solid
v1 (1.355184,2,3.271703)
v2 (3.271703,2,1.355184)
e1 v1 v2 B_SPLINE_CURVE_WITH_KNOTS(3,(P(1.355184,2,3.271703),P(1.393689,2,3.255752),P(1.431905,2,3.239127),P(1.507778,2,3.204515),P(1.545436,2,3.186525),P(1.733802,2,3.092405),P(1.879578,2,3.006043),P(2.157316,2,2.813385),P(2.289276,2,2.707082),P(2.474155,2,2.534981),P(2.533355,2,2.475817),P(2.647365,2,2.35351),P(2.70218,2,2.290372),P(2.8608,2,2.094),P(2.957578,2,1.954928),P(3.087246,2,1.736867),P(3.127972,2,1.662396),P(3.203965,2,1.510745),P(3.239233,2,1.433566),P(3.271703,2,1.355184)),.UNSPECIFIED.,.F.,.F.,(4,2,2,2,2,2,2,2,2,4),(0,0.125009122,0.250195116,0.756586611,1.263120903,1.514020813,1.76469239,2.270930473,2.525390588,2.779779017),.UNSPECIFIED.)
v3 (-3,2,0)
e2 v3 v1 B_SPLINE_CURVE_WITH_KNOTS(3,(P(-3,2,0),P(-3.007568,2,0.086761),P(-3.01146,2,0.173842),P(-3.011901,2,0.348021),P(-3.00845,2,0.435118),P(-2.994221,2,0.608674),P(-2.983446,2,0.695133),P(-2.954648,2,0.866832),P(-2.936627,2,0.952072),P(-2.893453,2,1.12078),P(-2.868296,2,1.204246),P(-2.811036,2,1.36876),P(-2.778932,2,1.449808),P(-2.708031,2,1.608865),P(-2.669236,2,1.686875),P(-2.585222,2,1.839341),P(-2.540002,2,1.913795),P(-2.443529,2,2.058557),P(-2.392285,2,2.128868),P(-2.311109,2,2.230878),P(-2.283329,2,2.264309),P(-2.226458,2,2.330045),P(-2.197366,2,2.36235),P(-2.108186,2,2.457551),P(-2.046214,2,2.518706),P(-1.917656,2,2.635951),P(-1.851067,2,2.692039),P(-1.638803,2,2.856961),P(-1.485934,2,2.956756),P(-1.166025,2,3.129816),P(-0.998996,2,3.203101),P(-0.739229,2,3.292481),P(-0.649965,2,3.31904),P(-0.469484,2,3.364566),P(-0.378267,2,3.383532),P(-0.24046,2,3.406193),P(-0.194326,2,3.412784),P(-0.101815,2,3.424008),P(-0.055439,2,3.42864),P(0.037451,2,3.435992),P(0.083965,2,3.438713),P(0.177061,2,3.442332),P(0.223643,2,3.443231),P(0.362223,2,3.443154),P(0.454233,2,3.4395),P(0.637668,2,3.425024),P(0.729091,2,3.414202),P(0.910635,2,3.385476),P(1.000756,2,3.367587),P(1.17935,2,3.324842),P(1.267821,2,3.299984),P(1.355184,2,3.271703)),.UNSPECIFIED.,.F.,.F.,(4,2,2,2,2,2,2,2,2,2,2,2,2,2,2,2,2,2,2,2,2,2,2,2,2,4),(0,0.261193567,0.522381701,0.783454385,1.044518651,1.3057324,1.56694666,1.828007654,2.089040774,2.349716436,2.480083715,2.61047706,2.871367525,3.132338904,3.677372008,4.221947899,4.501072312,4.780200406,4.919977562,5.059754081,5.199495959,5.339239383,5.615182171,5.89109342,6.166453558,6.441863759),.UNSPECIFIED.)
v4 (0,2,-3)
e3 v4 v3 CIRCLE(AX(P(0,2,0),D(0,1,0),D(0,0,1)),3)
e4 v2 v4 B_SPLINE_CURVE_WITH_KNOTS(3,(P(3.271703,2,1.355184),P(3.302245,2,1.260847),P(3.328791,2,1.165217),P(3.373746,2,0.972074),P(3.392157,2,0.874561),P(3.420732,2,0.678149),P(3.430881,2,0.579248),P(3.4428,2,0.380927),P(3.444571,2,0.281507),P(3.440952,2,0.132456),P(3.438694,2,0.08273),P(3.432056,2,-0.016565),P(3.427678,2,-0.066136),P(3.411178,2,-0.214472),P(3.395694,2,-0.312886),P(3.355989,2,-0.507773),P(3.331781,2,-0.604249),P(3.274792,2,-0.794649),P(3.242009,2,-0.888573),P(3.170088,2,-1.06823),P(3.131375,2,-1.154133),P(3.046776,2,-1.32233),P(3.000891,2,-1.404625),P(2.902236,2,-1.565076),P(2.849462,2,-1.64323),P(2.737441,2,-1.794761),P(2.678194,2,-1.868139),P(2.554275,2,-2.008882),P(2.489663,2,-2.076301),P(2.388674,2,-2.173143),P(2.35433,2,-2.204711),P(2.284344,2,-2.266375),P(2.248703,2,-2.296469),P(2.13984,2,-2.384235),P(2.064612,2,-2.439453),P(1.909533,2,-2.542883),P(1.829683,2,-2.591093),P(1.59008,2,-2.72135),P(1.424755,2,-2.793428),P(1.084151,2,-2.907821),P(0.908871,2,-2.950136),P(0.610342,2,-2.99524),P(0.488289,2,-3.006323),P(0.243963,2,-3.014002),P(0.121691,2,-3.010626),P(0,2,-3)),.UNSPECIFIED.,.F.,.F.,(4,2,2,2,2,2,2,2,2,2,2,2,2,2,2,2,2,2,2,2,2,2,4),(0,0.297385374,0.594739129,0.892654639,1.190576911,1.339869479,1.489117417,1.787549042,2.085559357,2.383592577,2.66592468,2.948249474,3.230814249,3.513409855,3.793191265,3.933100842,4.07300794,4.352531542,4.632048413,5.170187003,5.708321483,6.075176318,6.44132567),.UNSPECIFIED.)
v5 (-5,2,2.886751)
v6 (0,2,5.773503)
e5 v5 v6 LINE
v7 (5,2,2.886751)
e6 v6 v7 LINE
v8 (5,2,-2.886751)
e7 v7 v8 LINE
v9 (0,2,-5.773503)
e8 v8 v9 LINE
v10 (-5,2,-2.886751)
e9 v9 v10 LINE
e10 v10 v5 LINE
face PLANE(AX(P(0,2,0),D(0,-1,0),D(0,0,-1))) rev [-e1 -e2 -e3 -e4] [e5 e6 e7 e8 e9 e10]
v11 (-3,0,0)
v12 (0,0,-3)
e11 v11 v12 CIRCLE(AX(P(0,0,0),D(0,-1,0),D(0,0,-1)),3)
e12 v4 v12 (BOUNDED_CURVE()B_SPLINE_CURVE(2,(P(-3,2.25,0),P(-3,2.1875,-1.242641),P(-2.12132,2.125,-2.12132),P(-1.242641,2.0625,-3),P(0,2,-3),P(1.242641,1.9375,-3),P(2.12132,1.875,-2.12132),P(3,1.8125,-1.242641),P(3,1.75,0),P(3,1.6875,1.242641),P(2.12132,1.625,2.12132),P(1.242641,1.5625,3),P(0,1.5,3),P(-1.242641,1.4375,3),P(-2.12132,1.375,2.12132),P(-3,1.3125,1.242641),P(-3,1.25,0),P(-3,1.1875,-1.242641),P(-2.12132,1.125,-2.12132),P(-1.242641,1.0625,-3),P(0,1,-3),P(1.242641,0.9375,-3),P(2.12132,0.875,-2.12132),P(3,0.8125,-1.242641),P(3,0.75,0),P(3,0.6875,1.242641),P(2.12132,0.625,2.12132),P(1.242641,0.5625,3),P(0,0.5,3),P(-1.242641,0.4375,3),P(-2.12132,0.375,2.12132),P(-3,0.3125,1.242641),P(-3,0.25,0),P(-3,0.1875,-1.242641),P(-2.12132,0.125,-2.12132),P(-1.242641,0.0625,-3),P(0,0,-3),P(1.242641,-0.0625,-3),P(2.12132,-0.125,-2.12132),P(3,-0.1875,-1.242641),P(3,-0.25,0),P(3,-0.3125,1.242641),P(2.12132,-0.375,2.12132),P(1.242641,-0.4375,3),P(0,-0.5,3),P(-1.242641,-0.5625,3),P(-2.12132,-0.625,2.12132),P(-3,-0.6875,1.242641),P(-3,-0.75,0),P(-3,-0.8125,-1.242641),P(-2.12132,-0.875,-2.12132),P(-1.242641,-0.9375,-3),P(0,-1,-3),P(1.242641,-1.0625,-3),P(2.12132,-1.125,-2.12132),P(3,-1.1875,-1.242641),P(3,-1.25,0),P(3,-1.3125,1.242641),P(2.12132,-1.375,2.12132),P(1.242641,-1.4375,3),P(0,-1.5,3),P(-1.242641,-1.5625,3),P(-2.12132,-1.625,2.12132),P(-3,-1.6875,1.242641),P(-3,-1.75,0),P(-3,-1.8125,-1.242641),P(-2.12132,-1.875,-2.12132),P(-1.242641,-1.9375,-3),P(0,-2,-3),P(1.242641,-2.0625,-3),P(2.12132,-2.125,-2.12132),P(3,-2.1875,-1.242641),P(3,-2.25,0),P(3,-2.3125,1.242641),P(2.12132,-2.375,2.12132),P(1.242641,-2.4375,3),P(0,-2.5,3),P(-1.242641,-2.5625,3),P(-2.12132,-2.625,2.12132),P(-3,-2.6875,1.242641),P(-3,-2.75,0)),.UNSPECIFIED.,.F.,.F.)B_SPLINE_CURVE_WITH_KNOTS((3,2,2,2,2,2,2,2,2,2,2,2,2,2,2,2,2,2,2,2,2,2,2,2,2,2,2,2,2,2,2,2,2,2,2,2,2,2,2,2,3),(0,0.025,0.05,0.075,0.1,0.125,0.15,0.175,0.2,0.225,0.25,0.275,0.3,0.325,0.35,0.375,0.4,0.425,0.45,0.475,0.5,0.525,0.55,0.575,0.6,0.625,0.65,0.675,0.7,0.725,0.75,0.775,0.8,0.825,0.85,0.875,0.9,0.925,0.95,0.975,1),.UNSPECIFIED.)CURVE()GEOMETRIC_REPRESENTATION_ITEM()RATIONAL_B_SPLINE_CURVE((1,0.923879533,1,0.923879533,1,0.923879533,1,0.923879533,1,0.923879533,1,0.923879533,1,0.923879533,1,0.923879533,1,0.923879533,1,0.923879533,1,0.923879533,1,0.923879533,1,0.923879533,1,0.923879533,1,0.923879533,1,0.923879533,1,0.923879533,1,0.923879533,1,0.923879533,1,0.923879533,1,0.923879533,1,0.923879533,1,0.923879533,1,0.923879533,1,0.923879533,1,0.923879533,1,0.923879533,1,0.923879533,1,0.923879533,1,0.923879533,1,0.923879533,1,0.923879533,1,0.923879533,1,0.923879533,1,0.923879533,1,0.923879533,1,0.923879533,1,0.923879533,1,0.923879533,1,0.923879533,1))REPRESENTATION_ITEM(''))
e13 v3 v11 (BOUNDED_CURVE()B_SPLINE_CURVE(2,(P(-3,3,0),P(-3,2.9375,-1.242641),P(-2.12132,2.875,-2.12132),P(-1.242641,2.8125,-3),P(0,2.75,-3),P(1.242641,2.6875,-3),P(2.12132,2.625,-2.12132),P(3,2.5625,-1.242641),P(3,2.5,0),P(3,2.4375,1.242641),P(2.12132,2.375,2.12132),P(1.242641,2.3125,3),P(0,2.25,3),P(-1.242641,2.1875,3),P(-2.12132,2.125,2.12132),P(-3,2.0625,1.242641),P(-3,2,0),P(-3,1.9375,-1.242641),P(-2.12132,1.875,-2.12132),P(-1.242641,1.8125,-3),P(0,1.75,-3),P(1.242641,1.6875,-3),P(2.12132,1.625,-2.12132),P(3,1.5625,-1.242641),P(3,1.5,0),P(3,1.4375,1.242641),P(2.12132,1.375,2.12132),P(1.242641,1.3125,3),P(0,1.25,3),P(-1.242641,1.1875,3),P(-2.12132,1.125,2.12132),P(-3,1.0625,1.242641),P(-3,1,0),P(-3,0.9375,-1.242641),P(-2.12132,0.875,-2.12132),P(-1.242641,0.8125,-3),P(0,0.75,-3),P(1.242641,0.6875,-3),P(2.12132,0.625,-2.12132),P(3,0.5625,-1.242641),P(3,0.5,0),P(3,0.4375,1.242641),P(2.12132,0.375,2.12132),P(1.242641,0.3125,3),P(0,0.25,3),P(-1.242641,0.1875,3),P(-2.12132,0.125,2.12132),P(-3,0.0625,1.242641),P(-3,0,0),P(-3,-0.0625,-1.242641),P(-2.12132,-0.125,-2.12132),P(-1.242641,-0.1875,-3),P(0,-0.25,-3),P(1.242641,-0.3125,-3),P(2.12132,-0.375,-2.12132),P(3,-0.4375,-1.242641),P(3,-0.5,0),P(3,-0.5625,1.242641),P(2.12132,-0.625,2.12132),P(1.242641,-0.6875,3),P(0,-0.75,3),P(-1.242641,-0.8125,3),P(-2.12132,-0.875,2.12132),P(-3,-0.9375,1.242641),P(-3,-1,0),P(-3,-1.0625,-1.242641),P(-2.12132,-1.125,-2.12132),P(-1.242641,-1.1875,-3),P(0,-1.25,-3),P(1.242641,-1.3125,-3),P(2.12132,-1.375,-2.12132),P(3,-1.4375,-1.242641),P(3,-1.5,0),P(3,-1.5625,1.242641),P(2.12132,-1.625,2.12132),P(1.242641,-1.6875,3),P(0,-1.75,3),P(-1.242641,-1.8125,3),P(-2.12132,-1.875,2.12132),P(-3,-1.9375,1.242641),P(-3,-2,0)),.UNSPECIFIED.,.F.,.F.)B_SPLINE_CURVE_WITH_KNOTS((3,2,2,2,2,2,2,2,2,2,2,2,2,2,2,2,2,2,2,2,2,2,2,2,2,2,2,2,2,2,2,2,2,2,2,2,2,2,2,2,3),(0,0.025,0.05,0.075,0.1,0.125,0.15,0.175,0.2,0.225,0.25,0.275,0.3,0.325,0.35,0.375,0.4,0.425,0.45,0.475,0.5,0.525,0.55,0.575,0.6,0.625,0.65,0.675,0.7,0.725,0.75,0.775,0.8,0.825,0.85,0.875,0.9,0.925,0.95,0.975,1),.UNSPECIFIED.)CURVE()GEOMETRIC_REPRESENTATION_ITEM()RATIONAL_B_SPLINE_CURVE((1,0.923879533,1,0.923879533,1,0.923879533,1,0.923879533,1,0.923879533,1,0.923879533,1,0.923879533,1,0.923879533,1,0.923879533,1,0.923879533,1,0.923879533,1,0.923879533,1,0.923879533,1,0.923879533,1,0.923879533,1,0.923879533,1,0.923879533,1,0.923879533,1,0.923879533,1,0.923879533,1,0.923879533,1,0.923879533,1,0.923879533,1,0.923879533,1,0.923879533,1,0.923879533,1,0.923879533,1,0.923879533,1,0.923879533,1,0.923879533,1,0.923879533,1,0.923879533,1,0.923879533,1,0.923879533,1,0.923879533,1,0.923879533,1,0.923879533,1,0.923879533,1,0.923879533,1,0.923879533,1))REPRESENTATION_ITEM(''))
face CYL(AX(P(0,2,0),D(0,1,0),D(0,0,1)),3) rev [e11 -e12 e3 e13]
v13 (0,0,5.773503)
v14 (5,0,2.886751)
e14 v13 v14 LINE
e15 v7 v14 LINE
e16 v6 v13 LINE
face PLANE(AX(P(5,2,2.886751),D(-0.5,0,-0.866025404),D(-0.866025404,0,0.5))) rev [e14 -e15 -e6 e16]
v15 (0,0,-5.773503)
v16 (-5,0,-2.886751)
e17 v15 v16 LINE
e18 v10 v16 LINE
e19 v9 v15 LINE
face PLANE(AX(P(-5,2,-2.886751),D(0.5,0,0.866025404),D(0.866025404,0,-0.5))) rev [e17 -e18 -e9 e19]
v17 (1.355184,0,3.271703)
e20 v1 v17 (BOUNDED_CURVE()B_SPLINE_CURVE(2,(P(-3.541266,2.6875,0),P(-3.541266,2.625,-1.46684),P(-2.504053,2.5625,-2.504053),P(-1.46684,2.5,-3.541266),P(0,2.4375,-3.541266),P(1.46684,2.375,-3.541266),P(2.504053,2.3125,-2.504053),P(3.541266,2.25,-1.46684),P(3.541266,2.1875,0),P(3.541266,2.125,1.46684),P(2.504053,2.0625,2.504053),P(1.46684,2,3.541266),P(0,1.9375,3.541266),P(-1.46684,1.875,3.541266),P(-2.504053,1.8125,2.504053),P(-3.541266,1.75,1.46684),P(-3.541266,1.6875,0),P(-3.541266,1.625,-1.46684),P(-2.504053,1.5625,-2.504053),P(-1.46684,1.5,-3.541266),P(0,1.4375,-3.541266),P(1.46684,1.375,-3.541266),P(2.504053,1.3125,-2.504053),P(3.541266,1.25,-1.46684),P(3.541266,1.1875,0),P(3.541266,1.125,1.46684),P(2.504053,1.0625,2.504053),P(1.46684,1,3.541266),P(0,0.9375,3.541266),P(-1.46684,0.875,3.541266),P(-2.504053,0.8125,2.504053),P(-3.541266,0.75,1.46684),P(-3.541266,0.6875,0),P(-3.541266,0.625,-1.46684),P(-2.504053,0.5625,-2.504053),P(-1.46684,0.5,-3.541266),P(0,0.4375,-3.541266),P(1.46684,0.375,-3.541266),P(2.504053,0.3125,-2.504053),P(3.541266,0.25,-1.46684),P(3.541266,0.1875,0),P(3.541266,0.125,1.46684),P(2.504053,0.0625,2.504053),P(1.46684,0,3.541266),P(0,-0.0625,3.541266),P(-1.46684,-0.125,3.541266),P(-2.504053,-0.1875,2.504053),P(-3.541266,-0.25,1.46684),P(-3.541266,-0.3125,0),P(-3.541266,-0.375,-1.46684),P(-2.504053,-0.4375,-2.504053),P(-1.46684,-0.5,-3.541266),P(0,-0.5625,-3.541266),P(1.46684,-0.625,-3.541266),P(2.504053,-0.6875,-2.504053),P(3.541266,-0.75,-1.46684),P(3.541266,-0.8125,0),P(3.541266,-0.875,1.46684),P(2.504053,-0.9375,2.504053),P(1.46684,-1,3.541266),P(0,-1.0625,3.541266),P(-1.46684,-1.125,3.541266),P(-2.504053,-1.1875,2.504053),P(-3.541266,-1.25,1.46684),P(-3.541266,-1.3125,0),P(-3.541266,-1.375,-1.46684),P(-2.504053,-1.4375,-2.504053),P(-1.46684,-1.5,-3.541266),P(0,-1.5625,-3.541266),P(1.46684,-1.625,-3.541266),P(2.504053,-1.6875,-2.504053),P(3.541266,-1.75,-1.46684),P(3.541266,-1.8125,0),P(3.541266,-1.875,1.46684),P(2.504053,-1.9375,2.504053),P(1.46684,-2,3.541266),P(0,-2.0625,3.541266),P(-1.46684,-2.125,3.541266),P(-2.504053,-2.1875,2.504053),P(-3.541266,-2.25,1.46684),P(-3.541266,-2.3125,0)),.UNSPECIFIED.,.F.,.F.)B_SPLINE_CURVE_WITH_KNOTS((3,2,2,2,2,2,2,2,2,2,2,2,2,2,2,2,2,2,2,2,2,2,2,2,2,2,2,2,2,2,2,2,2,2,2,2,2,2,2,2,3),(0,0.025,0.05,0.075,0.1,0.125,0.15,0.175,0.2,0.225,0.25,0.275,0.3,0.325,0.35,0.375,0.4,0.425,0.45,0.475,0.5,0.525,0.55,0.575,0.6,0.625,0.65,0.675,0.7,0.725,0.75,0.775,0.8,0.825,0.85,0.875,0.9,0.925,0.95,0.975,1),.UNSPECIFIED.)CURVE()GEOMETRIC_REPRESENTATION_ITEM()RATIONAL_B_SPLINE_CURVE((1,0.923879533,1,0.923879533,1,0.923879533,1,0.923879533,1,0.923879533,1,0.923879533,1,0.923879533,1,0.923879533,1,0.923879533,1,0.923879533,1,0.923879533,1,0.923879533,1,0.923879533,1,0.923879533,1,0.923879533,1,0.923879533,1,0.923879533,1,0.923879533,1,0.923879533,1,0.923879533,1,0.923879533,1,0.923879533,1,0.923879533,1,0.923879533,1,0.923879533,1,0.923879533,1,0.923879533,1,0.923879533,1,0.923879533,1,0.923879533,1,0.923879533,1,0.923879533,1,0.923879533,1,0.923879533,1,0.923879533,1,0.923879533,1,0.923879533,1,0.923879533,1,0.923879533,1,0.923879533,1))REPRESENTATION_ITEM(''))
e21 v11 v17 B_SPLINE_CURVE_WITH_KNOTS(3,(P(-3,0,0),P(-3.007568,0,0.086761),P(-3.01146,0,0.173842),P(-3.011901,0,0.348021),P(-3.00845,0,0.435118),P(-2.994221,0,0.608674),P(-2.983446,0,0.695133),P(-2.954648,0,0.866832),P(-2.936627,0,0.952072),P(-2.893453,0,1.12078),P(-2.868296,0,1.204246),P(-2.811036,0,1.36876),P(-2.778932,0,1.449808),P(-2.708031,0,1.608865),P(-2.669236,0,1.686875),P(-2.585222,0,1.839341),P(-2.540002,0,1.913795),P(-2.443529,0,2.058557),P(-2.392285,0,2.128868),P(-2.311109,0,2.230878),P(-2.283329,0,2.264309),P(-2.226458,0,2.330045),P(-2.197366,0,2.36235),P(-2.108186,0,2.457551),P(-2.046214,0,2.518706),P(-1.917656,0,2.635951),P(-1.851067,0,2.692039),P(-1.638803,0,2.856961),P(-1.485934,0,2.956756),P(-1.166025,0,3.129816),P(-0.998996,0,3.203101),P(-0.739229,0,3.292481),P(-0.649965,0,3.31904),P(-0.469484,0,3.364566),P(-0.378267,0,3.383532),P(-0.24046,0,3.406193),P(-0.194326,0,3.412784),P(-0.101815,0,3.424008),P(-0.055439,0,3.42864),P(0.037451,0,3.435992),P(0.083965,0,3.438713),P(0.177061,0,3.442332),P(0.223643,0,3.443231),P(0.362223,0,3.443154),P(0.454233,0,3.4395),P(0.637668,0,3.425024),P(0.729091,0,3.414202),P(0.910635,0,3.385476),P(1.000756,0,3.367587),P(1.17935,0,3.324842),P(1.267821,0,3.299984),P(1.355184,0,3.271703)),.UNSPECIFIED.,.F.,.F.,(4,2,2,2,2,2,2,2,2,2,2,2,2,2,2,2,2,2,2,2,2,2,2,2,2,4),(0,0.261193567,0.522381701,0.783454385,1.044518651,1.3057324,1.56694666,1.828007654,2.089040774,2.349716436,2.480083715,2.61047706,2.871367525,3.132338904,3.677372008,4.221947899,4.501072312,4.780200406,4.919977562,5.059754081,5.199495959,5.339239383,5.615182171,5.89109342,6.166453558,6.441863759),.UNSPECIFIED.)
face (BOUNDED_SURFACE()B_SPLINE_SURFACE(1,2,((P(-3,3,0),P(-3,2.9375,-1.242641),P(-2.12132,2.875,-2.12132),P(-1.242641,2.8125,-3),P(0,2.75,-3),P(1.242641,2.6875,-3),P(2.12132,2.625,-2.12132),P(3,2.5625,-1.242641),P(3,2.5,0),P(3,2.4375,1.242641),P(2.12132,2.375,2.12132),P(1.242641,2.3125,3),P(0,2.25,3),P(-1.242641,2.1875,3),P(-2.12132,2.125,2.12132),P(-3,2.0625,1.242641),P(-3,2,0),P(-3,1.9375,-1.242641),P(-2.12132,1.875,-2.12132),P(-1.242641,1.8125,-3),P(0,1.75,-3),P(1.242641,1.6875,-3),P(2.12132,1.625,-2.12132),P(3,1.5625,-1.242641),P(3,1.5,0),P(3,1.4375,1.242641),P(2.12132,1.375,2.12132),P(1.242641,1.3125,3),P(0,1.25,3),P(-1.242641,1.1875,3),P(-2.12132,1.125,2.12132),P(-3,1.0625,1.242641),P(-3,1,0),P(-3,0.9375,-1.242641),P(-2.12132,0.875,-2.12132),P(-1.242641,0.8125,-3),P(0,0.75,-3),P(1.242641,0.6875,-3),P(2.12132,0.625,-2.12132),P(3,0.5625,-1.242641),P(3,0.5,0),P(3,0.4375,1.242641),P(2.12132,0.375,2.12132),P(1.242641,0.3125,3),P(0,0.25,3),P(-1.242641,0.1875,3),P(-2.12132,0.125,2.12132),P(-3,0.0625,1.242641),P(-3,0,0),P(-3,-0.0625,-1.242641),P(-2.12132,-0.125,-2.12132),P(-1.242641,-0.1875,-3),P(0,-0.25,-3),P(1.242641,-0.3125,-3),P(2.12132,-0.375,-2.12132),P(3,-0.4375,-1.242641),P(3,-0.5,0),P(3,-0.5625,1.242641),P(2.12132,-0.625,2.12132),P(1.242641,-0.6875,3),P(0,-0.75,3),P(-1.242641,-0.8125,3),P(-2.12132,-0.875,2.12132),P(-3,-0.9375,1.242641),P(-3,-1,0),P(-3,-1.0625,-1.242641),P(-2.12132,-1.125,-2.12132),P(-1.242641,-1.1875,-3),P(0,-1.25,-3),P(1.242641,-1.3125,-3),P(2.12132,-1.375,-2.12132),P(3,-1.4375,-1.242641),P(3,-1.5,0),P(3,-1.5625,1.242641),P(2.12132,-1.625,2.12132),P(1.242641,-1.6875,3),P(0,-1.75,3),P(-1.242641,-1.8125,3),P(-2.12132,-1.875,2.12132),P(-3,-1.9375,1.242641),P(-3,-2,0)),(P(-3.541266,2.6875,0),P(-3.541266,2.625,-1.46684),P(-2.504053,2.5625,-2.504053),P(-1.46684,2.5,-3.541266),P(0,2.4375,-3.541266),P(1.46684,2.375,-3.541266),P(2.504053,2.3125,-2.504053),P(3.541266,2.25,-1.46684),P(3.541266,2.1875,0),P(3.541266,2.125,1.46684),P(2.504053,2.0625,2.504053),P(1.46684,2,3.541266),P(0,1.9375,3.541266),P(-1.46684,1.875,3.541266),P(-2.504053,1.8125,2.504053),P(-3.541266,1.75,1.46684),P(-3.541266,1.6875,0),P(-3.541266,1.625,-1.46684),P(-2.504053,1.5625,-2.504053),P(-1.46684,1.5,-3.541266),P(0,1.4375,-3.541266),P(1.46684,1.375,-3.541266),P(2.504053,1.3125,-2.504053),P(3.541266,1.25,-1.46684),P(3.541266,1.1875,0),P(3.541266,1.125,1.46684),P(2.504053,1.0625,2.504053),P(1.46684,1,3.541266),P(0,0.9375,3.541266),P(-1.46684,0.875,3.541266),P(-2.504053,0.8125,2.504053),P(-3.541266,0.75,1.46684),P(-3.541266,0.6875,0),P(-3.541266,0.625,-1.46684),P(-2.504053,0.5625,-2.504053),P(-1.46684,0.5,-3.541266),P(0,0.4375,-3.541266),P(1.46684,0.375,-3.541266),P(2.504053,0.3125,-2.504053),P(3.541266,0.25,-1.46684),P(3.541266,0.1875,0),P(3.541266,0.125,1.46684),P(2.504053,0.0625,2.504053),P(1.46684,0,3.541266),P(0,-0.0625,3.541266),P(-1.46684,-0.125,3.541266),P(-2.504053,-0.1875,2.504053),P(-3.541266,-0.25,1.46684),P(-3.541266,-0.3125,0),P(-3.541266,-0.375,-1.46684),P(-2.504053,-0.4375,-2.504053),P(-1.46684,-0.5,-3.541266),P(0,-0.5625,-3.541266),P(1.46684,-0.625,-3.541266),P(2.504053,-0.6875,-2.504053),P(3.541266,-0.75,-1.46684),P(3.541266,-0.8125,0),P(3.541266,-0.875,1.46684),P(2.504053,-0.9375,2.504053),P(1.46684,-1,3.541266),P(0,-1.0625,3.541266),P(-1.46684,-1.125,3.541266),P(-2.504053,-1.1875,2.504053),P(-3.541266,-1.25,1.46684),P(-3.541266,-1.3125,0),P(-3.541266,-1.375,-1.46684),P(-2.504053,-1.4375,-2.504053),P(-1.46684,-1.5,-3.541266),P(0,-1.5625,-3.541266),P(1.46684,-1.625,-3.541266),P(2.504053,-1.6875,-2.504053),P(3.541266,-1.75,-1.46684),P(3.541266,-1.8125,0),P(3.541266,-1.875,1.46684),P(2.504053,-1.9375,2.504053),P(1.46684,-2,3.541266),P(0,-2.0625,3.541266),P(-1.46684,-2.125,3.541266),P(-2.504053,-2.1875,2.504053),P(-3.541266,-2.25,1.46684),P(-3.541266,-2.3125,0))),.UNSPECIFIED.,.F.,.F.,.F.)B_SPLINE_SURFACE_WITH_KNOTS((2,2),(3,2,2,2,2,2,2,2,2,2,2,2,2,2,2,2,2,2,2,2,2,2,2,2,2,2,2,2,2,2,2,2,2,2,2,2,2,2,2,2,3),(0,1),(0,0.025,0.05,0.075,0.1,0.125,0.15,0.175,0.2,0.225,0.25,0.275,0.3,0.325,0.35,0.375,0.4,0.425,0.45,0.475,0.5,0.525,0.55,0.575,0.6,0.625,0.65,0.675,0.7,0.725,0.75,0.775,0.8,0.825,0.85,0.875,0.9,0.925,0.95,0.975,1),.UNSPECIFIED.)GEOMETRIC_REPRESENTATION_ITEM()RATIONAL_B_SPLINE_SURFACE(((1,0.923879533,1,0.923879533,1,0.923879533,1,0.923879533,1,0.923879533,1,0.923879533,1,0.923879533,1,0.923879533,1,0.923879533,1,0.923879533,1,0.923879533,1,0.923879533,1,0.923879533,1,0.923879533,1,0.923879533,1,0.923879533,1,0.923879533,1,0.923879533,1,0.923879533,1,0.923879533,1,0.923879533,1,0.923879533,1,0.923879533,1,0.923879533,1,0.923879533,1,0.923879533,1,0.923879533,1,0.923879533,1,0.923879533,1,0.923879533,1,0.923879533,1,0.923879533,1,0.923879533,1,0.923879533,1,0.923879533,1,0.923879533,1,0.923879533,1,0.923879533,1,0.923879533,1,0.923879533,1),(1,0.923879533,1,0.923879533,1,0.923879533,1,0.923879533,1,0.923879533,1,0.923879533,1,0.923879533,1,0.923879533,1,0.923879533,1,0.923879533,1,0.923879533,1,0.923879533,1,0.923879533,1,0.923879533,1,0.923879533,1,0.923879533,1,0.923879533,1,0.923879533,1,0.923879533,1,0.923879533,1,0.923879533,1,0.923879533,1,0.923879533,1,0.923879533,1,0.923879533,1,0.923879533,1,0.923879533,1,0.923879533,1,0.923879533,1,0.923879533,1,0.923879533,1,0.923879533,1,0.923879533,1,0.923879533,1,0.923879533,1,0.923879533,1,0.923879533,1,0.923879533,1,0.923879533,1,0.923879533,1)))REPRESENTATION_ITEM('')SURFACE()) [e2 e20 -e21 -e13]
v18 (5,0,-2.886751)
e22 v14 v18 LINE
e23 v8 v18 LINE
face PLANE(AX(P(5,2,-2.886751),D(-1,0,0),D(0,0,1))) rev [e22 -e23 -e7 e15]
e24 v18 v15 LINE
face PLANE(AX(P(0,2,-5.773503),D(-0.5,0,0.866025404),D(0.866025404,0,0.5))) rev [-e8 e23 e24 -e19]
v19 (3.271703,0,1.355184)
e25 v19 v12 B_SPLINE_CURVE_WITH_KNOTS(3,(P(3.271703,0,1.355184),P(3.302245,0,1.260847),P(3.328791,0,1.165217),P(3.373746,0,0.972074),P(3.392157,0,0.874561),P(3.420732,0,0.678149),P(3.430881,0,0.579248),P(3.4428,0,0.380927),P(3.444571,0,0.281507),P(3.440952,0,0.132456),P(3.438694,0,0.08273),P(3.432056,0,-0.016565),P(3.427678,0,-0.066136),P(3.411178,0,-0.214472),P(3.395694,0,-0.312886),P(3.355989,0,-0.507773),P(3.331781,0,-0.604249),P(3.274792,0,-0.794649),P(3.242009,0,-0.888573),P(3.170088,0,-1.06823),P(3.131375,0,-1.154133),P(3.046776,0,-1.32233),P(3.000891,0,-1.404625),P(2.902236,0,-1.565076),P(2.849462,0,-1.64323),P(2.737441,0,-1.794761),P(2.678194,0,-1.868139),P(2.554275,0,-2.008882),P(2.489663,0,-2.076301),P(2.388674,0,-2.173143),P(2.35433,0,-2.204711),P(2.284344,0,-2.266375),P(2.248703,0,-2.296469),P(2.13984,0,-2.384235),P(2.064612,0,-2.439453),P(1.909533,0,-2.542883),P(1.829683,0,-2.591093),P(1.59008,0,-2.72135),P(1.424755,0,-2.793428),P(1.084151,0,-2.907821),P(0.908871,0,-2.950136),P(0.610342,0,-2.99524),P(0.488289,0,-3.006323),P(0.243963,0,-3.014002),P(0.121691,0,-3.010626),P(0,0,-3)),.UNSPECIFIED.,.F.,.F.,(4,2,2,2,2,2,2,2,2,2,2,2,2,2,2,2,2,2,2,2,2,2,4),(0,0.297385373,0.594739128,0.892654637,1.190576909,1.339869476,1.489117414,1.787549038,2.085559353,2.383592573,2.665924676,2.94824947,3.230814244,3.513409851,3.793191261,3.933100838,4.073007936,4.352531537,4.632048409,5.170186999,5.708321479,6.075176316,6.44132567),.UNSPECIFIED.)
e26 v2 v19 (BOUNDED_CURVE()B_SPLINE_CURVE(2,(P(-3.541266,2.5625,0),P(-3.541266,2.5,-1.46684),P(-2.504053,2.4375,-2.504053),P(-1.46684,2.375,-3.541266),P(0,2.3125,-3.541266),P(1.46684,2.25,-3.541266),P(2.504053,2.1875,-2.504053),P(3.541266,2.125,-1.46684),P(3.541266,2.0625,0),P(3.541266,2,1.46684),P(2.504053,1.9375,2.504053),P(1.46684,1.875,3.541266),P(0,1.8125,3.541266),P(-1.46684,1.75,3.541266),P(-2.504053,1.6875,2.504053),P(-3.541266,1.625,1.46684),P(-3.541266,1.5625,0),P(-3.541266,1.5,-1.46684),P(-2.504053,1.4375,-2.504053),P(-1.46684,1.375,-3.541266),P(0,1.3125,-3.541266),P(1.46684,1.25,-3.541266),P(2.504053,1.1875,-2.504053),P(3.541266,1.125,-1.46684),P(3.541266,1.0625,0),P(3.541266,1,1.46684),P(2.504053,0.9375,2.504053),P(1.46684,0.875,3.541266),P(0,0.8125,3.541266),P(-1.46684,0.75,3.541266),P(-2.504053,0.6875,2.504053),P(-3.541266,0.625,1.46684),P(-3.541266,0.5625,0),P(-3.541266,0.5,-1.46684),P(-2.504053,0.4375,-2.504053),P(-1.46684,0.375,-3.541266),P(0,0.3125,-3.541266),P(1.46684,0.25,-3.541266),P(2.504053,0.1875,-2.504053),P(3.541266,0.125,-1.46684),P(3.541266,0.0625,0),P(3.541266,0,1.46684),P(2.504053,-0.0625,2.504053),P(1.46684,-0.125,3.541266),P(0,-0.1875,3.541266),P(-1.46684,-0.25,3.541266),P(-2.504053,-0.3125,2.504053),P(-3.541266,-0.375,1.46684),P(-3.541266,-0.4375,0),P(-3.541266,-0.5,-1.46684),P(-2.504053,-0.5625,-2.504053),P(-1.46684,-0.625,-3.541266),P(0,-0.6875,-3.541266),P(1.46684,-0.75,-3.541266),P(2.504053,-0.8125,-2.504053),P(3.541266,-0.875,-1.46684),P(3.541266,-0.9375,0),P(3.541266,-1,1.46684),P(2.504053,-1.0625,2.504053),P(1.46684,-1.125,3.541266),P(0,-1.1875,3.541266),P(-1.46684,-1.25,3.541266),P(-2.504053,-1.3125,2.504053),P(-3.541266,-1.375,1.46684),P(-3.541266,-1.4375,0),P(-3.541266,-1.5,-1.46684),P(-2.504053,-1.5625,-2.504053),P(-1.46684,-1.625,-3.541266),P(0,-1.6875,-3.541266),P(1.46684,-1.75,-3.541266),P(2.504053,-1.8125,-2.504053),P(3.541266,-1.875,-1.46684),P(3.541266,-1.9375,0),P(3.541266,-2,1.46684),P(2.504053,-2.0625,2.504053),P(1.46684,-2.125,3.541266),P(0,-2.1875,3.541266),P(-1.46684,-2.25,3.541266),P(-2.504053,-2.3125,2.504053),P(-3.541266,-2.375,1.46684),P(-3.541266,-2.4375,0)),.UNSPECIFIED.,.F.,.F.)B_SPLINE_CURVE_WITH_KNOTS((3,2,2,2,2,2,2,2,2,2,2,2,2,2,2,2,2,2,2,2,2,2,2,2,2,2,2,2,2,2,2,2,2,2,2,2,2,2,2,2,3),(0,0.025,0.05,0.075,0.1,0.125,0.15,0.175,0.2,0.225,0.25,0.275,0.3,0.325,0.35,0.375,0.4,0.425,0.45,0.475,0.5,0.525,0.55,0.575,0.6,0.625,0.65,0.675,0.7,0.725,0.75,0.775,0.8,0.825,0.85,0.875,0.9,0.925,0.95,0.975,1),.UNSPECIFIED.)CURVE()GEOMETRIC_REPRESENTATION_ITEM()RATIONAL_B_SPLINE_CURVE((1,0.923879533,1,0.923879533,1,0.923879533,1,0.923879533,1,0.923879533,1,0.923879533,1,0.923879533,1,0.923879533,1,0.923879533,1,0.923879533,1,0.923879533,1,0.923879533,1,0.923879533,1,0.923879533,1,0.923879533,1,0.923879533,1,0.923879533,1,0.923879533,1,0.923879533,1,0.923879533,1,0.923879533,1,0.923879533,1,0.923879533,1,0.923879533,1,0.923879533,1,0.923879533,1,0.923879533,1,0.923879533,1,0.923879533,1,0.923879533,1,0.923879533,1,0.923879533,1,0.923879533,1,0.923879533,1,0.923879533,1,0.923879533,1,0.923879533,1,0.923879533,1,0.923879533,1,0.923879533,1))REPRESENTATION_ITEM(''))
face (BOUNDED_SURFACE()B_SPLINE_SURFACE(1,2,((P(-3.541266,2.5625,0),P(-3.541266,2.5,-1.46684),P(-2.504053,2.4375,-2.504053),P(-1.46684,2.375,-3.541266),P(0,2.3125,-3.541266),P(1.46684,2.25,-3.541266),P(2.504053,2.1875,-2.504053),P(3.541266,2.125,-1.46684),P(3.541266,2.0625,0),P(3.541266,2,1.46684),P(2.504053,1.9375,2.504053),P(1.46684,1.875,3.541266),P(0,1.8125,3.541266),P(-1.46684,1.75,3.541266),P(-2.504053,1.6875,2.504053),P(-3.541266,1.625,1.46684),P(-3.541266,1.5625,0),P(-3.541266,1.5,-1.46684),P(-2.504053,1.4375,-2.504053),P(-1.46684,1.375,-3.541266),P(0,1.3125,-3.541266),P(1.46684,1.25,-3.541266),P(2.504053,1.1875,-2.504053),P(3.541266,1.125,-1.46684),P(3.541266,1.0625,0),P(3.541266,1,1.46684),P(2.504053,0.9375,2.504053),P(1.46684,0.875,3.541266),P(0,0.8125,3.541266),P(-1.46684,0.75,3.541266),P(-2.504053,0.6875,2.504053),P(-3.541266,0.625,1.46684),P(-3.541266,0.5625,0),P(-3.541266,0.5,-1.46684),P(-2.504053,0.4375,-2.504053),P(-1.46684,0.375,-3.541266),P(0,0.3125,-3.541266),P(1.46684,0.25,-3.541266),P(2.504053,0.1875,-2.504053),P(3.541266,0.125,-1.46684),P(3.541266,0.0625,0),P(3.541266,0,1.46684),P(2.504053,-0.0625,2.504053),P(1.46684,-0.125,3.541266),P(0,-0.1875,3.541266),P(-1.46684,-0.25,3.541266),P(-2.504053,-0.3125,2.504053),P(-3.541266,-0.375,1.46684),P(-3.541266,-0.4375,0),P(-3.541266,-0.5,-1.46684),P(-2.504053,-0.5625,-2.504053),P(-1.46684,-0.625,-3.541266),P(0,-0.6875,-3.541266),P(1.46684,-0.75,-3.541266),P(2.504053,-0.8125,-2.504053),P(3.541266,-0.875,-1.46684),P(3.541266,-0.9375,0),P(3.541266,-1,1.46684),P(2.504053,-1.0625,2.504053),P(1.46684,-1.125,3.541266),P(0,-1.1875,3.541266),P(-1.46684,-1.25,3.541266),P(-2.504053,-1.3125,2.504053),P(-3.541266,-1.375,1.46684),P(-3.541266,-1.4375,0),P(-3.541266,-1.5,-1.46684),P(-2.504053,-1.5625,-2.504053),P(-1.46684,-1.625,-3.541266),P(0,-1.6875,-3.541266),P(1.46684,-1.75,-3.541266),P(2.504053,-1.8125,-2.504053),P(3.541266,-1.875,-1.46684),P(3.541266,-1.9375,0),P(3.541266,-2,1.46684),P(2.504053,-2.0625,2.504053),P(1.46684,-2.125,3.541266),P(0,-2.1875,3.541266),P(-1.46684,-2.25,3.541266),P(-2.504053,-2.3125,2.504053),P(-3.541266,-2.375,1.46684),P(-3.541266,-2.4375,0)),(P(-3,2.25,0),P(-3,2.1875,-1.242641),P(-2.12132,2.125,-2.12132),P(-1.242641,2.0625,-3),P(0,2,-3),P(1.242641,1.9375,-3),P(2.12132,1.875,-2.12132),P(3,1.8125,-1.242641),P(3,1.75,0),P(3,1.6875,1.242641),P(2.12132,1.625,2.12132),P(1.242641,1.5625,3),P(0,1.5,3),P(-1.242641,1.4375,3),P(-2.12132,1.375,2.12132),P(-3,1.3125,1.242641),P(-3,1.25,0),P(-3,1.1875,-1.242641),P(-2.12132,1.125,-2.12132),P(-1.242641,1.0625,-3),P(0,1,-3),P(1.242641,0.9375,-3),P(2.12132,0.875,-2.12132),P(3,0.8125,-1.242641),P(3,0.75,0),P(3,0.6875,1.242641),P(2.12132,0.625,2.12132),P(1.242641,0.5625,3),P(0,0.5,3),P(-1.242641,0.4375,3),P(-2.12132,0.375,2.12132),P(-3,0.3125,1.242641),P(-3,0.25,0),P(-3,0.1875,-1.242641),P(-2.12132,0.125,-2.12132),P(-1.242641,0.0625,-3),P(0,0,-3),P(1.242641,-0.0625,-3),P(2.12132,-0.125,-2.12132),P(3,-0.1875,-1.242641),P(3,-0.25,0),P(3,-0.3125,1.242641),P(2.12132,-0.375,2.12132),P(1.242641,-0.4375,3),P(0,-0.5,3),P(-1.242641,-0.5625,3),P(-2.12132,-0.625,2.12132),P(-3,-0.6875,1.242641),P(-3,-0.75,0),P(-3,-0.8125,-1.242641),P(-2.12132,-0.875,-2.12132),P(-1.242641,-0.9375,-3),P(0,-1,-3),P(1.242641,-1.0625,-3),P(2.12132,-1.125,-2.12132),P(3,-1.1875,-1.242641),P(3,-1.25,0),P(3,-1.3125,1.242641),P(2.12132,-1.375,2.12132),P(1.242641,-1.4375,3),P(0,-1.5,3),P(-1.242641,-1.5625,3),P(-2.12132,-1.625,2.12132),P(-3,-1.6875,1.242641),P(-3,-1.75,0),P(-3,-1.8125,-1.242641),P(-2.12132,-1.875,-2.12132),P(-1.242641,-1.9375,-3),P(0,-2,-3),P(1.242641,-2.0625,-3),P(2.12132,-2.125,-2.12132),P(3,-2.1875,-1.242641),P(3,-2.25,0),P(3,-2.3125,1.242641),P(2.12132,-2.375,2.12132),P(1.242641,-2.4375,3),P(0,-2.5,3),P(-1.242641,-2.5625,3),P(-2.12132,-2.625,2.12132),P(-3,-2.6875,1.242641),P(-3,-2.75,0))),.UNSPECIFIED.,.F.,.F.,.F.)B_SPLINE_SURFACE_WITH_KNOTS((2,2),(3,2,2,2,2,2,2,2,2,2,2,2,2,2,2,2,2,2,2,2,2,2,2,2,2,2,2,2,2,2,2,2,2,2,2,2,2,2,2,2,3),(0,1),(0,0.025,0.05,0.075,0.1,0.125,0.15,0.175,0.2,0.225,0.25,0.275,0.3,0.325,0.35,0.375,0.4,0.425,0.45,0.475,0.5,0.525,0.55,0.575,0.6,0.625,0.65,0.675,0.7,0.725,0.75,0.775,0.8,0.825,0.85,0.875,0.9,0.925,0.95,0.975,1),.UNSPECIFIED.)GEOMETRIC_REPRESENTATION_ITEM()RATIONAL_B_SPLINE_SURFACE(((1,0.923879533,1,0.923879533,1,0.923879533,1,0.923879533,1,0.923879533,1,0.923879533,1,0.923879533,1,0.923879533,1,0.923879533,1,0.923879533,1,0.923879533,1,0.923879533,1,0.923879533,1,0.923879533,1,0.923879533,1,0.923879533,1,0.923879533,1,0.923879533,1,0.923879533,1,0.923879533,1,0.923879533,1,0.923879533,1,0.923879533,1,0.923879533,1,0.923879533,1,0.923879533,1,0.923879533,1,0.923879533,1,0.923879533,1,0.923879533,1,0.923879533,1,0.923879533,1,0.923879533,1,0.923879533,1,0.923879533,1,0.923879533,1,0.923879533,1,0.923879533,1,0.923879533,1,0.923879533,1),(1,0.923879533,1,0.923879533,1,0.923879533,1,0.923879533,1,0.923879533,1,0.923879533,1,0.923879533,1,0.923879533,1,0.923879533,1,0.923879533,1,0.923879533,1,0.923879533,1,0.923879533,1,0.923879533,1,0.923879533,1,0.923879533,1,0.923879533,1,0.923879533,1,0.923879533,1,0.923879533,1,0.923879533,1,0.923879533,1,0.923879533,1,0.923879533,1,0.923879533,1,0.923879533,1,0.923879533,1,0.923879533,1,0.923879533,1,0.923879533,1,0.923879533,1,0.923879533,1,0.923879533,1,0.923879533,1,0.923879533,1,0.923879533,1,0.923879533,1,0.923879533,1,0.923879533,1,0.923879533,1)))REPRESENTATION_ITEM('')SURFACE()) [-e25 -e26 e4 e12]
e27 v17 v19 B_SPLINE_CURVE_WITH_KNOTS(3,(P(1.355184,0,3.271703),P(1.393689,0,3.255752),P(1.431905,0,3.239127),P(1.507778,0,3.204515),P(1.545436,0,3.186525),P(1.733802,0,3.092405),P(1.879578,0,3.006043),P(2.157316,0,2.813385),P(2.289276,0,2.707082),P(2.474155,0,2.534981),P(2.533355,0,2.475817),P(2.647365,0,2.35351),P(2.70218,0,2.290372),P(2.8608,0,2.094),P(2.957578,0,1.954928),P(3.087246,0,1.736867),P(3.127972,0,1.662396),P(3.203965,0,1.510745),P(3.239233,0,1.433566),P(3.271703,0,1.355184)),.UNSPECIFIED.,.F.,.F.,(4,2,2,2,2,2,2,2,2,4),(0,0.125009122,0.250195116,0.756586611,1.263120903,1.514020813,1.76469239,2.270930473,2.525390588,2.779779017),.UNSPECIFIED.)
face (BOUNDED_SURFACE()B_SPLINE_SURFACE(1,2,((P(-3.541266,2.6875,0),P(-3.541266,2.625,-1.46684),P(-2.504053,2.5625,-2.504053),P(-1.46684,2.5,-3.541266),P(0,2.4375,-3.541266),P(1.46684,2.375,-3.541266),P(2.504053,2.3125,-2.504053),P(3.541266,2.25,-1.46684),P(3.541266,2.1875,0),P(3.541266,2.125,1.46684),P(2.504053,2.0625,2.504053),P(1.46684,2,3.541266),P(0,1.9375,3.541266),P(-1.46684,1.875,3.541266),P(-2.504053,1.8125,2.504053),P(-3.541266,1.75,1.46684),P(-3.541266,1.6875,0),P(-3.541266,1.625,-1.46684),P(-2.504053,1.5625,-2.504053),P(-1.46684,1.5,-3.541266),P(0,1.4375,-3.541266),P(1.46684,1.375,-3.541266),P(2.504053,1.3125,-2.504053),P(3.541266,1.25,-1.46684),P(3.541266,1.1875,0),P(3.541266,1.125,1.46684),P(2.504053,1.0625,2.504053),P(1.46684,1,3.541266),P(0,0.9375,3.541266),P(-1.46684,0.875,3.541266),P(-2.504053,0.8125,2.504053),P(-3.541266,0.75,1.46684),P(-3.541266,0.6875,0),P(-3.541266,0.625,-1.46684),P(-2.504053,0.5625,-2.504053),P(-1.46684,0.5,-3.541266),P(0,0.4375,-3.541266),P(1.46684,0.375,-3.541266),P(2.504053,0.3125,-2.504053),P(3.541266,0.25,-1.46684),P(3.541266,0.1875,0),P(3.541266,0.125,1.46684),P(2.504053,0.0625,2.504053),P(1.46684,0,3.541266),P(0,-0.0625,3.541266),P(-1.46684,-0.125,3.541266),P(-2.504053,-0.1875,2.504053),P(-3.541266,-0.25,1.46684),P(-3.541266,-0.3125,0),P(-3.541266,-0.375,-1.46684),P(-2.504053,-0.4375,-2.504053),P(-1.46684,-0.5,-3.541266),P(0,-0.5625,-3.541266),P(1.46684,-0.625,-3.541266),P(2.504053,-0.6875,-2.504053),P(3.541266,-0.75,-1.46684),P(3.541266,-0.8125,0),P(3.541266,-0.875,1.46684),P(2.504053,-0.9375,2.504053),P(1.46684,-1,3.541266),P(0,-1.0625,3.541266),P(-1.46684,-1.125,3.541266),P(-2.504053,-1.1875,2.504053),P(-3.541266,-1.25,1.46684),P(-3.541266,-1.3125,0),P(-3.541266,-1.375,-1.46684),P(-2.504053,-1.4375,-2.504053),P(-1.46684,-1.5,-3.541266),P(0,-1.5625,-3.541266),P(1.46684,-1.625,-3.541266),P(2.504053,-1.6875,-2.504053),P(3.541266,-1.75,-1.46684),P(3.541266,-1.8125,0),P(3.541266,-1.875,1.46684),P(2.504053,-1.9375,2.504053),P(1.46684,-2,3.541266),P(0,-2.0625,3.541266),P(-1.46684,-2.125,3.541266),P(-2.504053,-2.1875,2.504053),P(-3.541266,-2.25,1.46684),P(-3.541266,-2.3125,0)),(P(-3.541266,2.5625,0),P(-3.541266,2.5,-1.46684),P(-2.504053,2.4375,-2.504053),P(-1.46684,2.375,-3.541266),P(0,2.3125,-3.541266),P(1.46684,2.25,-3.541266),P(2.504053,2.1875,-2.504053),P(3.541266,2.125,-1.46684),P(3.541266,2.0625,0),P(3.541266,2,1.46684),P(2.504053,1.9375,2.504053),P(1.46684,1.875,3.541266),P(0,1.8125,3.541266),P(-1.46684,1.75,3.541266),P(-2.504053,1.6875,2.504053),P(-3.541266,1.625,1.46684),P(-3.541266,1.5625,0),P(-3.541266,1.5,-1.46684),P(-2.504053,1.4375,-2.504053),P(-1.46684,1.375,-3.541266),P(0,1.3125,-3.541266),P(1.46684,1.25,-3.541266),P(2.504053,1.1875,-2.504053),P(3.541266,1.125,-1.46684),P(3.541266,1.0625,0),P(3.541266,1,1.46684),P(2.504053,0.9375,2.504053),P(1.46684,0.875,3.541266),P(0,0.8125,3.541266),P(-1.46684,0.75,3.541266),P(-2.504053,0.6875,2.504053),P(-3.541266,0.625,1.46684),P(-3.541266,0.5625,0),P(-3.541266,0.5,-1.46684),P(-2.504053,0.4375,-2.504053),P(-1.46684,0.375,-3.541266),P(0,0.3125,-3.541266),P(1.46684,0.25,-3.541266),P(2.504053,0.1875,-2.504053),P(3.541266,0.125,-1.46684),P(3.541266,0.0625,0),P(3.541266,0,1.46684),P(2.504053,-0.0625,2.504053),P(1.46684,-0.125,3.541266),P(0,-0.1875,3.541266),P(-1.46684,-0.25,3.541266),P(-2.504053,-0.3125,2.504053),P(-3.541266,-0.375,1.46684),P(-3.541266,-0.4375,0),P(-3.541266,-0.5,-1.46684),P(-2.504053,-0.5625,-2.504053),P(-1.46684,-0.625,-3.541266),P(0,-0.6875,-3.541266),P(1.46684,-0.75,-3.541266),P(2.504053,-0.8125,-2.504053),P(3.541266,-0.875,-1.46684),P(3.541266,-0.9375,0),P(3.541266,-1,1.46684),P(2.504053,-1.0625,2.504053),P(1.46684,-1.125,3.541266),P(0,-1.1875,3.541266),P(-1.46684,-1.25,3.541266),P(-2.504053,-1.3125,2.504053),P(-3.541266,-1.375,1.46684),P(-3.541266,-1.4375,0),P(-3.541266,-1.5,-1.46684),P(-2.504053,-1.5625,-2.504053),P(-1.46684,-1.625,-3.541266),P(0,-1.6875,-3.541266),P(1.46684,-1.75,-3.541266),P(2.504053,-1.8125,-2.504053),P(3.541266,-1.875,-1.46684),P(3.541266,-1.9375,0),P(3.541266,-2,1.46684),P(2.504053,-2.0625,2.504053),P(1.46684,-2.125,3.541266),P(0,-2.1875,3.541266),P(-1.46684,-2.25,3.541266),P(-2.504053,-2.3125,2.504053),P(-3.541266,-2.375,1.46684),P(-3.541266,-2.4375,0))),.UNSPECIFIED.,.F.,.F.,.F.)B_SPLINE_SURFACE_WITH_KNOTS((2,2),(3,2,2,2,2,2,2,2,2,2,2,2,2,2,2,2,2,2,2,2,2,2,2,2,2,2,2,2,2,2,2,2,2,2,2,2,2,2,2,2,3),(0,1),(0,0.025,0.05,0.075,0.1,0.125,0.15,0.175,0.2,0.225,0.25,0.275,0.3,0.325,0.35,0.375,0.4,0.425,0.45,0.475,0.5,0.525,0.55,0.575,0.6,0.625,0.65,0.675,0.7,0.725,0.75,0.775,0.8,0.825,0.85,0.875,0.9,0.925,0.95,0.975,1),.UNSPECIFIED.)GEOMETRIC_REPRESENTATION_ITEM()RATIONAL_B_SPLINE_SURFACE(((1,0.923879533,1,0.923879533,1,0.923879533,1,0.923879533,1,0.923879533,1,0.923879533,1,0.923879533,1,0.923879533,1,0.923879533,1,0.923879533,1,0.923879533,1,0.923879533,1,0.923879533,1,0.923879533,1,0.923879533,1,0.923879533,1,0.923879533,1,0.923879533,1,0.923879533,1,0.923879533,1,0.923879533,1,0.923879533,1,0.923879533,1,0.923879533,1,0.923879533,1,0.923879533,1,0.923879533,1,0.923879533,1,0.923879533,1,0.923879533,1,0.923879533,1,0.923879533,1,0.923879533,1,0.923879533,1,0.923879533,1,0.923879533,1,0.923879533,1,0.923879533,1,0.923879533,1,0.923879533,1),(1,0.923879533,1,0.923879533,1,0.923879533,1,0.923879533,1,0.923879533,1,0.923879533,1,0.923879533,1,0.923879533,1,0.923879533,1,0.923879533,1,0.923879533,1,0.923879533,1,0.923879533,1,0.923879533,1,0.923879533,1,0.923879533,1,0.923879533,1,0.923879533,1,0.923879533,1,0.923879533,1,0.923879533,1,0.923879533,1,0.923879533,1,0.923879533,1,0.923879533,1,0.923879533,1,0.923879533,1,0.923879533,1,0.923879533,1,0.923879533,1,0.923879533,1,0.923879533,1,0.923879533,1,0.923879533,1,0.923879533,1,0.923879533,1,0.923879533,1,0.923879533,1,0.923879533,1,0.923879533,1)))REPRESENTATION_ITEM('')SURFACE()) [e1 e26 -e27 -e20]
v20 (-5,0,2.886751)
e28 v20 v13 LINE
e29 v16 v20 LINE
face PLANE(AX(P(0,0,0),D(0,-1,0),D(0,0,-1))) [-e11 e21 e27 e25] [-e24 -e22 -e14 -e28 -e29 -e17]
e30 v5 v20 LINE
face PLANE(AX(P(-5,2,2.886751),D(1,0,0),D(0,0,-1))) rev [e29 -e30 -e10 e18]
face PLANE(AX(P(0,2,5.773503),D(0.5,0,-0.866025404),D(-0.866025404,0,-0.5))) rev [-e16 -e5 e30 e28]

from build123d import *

# Parameters (mm, degrees)
SKETCH_1_R      = 2.5
EXTRUDE_1_DEPTH = 2
M7X1_02_D       = 6
M7X1_02_DEPTH   = 10
M7X1_02_TIP     = 1.802581857
THREAD_2_PITCH  = 1


with BuildPart() as part:
    # Эскиз1 → Бобышка-Вытянуть1 (new body)
    with BuildSketch(Plane(origin=(0, 0, 0), x_dir=(1, 0, 0), z_dir=(0, 1, 0))):
        Polygon((-5, -2.886751346), (-5, 2.886751346), (0, 5.773502692), (5, 2.886751346), (5, -2.886751346), (0, -5.773502692), align=None)
        with Locations(Location((0, 0, 0), (0, 0, 270))):
            Circle(SKETCH_1_R, mode=Mode.SUBTRACT)
    extrude(amount=EXTRUDE_1_DEPTH)

    # Сверление под метчик M7x1.02
    with Locations(Plane(origin=(0, 2, 0), x_dir=(1, 0, 0), z_dir=(0, 1, 0))):
        with Locations((0, 0)):
            Hole(M7X1_02_D / 2, depth=M7X1_02_DEPTH)
            with Locations((0, 0, -(M7X1_02_DEPTH + M7X1_02_TIP / 2))):  # 118° drill point
                Cone(0, M7X1_02_D / 2, M7X1_02_TIP, mode=Mode.SUBTRACT)

    # Резьба2: the profile of Профиль резьбы2 profile screwed along a right-hand helix of 5 turns, 8 arcs to a turn; built about Z, then put on its axis
    thread_2_z = Axis((0, 0, 0), (0, 0, 1))
    thread_2_corners = [(2.9997, 0, -0.000173205), (3.541265875, 0, 0.312499999), (3.541265875, 0, 0.437499999), (2.9997, 0, 0.750173202)]
    with BuildLine(mode=Mode.PRIVATE) as thread_2_profile:
        Line(thread_2_corners[0], thread_2_corners[1])
        Line(thread_2_corners[1], thread_2_corners[2])
        Line(thread_2_corners[2], thread_2_corners[3])
        Line(thread_2_corners[3], thread_2_corners[0])
    thread_2_cap = Face(thread_2_profile.wire())
    thread_2_turn_angles = [0, 22.5, 45, 67.5, 90, 112.5, 135, 157.5, 180, 202.5, 225, 247.5, 270, 292.5, 315, 337.5, 360]
    thread_2_turn_weights = [1, 0.9238795325112867, 1, 0.9238795325112867, 1, 0.9238795325112867, 1, 0.9238795325112867, 1, 0.9238795325112867, 1, 0.9238795325112867, 1, 0.9238795325112867, 1, 0.9238795325112867, 1]
    thread_2_turn_rails = [Edge.make_bspline([Vector(p[0], p[1], 0).rotate(thread_2_z, thread_2_turn_angles[k]) / thread_2_turn_weights[k] + Vector(0, 0, p[2] + THREAD_2_PITCH * thread_2_turn_angles[k] / 360) for k in range(17)], [0, 0, 0, 1, 1, 2, 2, 3, 3, 4, 4, 5, 5, 6, 6, 7, 7, 8, 8, 8], 2, thread_2_turn_weights) for p in thread_2_corners]
    thread_2_turn_sides = [Face.make_surface_from_curves(thread_2_turn_rails[p[0]], thread_2_turn_rails[p[1]]) for p in [(0, 1), (1, 2), (2, 3), (3, 0)]]
    thread_2 = Plane(origin=(0, 3, 0), x_dir=(-1, 0, 0), z_dir=(0, -1, 0)) * Solid(Shell([*[p.moved(Location((0, 0, THREAD_2_PITCH * i))) for i in range(5) for p in thread_2_turn_sides], thread_2_cap, thread_2_cap.rotate(thread_2_z, 1800).moved(Location((0, 0, THREAD_2_PITCH * 1800 / 360)))]))
    add(thread_2, mode=Mode.SUBTRACT)


solid = part.part
